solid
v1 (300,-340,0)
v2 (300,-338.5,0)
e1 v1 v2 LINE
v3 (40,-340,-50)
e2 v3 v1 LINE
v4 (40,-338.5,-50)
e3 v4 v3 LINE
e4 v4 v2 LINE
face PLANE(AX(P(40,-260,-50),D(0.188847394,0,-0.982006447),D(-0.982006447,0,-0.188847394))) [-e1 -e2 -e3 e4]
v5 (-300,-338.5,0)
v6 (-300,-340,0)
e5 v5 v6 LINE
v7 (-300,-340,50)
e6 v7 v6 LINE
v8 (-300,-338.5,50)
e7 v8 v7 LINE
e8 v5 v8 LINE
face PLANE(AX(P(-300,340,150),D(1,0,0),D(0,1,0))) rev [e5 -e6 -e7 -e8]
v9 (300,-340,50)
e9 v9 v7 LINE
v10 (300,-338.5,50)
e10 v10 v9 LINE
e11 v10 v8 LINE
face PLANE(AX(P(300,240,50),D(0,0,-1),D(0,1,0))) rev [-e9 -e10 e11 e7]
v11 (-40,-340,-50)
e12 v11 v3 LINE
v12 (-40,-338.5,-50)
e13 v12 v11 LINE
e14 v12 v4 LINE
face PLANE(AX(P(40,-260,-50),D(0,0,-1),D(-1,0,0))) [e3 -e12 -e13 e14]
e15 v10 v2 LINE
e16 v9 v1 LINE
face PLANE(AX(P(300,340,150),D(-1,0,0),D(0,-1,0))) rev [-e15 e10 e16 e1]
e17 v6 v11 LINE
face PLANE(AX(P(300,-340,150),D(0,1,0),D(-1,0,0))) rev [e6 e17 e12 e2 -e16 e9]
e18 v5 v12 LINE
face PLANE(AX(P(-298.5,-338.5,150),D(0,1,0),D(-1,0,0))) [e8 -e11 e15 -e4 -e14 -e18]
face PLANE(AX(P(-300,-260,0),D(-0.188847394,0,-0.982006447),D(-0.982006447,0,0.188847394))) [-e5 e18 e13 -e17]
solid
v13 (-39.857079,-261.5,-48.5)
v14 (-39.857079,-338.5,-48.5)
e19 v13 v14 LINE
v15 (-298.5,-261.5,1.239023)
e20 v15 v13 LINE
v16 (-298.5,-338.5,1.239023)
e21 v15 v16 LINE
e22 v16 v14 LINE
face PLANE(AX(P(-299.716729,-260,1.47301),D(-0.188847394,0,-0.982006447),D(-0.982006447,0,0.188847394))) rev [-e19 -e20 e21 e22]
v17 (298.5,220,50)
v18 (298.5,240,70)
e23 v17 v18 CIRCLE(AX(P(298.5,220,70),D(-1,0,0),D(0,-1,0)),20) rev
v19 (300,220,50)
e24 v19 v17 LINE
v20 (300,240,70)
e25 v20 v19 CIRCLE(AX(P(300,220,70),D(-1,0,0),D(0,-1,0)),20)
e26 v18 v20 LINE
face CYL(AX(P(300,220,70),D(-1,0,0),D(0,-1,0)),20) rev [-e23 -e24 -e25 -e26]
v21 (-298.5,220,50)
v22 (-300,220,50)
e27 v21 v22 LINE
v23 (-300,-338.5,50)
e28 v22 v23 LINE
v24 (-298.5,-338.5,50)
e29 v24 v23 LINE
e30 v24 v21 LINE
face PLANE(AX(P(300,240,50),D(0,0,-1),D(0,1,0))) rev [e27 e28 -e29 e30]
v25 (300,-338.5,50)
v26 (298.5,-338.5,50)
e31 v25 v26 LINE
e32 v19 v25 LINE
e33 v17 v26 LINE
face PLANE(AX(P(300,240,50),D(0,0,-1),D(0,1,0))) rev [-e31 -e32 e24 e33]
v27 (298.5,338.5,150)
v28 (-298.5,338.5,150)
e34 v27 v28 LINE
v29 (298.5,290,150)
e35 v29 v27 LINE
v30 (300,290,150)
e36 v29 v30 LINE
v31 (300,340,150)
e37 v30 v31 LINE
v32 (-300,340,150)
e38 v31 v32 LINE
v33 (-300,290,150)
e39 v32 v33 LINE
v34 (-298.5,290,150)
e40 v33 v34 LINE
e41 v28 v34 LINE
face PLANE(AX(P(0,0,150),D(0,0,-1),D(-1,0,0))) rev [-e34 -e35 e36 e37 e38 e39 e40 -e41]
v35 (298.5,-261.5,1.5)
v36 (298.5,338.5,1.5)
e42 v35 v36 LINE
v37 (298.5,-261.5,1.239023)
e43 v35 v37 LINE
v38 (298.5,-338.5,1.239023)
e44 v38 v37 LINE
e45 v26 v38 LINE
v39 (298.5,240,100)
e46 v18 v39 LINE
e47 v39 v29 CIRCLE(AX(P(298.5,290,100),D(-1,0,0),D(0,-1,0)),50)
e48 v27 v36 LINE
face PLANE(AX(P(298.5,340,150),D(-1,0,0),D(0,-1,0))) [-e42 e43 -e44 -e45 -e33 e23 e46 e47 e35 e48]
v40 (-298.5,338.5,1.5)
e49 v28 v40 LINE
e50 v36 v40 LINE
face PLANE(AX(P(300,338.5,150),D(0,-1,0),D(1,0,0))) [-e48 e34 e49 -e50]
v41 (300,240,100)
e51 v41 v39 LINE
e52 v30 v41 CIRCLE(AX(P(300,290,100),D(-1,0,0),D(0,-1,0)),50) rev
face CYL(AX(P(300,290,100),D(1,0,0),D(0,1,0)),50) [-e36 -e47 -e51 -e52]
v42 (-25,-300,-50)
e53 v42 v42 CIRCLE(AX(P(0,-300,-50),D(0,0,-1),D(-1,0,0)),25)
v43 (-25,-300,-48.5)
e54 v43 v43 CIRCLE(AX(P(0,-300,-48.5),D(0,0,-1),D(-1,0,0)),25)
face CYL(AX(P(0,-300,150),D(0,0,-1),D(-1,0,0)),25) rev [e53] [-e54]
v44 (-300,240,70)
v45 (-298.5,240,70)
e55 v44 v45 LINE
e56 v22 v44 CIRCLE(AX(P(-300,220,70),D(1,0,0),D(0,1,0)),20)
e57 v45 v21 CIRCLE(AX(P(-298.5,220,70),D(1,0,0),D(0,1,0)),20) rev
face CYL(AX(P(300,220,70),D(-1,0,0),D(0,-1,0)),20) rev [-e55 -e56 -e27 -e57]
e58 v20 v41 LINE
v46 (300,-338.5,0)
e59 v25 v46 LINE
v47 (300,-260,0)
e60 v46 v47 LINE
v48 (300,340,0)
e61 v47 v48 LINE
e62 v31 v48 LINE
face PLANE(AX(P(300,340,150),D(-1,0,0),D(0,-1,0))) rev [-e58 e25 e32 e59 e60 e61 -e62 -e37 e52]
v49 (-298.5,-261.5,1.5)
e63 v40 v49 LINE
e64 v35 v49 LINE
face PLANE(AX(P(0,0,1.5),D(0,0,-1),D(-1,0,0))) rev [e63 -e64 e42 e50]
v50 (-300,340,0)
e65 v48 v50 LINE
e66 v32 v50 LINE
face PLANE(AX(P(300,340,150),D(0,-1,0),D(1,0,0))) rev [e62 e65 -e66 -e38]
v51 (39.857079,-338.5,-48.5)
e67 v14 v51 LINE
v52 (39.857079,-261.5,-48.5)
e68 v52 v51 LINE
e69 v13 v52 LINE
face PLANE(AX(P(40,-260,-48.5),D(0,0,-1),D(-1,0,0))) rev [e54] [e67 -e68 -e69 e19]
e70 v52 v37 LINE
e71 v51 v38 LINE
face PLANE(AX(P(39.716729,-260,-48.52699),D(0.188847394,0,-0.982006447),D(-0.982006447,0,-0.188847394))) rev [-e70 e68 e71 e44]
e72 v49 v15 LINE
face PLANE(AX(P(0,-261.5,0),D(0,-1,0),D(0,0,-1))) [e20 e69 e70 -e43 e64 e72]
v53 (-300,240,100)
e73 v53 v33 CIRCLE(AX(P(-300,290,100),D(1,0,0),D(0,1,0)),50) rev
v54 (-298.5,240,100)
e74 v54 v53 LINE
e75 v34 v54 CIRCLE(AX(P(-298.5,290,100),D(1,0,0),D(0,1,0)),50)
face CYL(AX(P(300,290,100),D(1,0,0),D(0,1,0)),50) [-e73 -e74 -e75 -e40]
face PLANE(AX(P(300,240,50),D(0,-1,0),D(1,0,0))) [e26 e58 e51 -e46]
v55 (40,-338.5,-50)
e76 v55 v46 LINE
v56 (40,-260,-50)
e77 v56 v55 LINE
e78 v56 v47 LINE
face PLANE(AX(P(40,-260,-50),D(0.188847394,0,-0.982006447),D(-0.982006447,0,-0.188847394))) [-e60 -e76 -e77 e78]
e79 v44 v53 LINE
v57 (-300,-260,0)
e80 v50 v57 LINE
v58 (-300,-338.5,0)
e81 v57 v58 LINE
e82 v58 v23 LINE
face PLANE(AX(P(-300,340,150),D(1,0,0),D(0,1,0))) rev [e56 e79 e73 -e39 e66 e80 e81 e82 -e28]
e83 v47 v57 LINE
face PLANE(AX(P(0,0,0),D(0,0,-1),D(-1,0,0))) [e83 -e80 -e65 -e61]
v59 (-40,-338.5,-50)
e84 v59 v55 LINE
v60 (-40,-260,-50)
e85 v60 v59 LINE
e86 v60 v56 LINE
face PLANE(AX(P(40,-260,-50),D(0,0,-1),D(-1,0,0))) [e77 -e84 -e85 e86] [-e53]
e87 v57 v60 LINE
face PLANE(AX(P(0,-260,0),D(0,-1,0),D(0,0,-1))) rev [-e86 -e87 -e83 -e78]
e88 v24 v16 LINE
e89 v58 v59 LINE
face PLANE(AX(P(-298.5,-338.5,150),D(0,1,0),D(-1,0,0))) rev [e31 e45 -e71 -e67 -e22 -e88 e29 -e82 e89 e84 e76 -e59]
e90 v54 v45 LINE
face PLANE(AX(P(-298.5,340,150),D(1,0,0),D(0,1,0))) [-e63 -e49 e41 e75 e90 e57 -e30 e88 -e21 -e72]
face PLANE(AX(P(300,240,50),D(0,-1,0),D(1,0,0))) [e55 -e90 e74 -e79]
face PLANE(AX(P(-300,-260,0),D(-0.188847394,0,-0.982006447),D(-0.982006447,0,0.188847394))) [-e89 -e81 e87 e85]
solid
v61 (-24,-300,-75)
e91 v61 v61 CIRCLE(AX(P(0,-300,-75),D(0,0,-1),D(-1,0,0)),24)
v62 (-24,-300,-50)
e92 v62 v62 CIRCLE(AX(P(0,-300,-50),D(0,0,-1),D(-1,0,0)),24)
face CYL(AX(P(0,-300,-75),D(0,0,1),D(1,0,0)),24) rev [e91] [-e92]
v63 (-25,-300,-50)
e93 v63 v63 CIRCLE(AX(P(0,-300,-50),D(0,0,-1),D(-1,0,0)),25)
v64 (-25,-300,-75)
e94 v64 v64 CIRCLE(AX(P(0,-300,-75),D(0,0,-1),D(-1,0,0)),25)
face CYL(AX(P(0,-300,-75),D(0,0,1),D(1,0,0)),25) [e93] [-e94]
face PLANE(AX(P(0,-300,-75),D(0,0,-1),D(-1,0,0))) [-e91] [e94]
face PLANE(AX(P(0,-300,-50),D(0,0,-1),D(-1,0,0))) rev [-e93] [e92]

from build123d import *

# Parameters (mm, degrees)
SKETCH_6_W                 = 600
SKETCH_6_H                 = 680
EXTRUDE_2_DEPTH            = 150
EXTRUDE_4_DEPTH            = 80
SHELL_START                = -338.5
SHELL_2_OUTLINE_W          = 597
SHELL_2_OUTLINE_H          = 148.5
SHELL_2_DEPTH              = 677
SHELL_2_2_DEPTH            = 77
SKETCH_13_R                = 25
CUT_EXTRUDE_1_DEPTH        = 496.580467735
SPLIT_START                = -340
SPLIT_BODIES_5_DEPTH       = 1.5
SPLIT_BODIES_5_2_OUTLINE_W = 602
SPLIT_BODIES_5_2_OUTLINE_H = 203
SPLIT_BODIES_5_2_DEPTH     = 1.5
SKETCH_15_W                = 200.791070075
SKETCH_15_H                = 666.3886285
CUT_EXTRUDE_2_DEPTH        = 706.761999544
FILLET_1_R                 = 20
FILLET_2_R                 = 50
SKETCH_16_R                = 25
SKETCH_16_R_2              = 24
EXTRUDE_5_DEPTH            = 25


# Read off the part's stored shape, not the designer's step: 抽壳2, 分割5
with BuildPart() as part:
    # 草图6 → 凸台-拉伸2 (new body)
    with BuildSketch(Plane.XY):
        Rectangle(SKETCH_6_W, SKETCH_6_H)
    extrude(amount=EXTRUDE_2_DEPTH)

    # 草图8 → 凸台-拉伸4 (add)
    with BuildSketch(Plane.XZ.offset(340)):
        Polygon((-300, 0), (-40, -50), (40, -50), (300, 0), align=None)
    extrude(amount=-EXTRUDE_4_DEPTH)

    # 抽壳2 outline → 抽壳2 (cut)
    with BuildSketch(Plane(origin=(0, 0, 0), x_dir=(1, 0, 0), z_dir=(0, 1, 0)).offset(SHELL_START)):
        with Locations((0, -75.75)):
            Rectangle(SHELL_2_OUTLINE_W, SHELL_2_OUTLINE_H)
    extrude(amount=SHELL_2_DEPTH, mode=Mode.SUBTRACT)

    # Shell 2 2 outline → Shell 2 2 (cut)
    with BuildSketch(Plane(origin=(0, 0, 0), x_dir=(1, 0, 0), z_dir=(0, 1, 0)).offset(SHELL_START)):
        Polygon((-298.5, -1.5), (298.5, -1.5), (298.5, -1.239023342), (39.857078623, 48.5), (-39.857078623, 48.5), (-298.5, -1.239023342), align=None)
    extrude(amount=SHELL_2_2_DEPTH, mode=Mode.SUBTRACT)

    # 草图13 → 切除-拉伸1 (cut, through all)
    with BuildSketch(Plane(origin=(0, 0, -50), x_dir=(-1, 0, 0), z_dir=(0, 0, -1))):
        with Locations((0, -300)):
            Circle(SKETCH_13_R)
    extrude(amount=-CUT_EXTRUDE_1_DEPTH, mode=Mode.SUBTRACT)

    # Split Bodies 5 2 outline → Split Bodies 5 2 (cut)
    with BuildSketch(Plane(origin=(0, 0, 0), x_dir=(1, 0, 0), z_dir=(0, 1, 0)).offset(SPLIT_START)):
        with Locations((0, -49.5)):
            Rectangle(SPLIT_BODIES_5_2_OUTLINE_W, SPLIT_BODIES_5_2_OUTLINE_H)
    extrude(amount=SPLIT_BODIES_5_2_DEPTH, mode=Mode.SUBTRACT)


with BuildPart() as body_2:
    # Split Bodies 5 outline → Split Bodies 5 (new body)
    with BuildSketch(Plane(origin=(0, 0, 0), x_dir=(1, 0, 0), z_dir=(0, 1, 0)).offset(SPLIT_START)):
        Polygon((-300, -150), (300, -150), (300, 0), (40, 50), (-40, 50), (-300, 0), align=None)
    extrude(amount=SPLIT_BODIES_5_DEPTH)


with BuildPart() as cut_extrude_2_tool:
    # 草图15 → 切除-拉伸2 (new, through all)
    with BuildSketch(Plane.ZY.offset(300)):
        with Locations((150.395535037, -93.19431425)):
            Rectangle(SKETCH_15_W, SKETCH_15_H)
    extrude(amount=-CUT_EXTRUDE_2_DEPTH)


with BuildPart() as part_1:
    add(part.part)

    # 切除-拉伸2: cut by cut_extrude_2_tool
    add(cut_extrude_2_tool.part, mode=Mode.SUBTRACT)

    # 圆角1
    fillet_1_edges = [part_1.edges().sort_by_distance(p)[0] for p in [
        (-299.25, 240, 50),
        (299.25, 240, 50),
    ]]
    fillet(fillet_1_edges, radius=FILLET_1_R)

    # 圆角2
    fillet_2_edges = [part_1.edges().sort_by_distance(p)[0] for p in [
        (-299.25, 240, 150),
        (299.25, 240, 150),
    ]]
    fillet(fillet_2_edges, radius=FILLET_2_R)


with BuildPart() as body_2_1:
    add(body_2.part)

    # 切除-拉伸2: cut by cut_extrude_2_tool
    add(cut_extrude_2_tool.part, mode=Mode.SUBTRACT)


with BuildPart() as body_3:
    # 草图16 → 凸台-拉伸5 (new body)
    with BuildSketch(Plane(origin=(0, 0, -50), x_dir=(-1, 0, 0), z_dir=(0, 0, -1))):
        with Locations((0, -300)):
            Circle(SKETCH_16_R)
        with Locations((0, -300)):
            Circle(SKETCH_16_R_2, mode=Mode.SUBTRACT)
    extrude(amount=EXTRUDE_5_DEPTH)


solid = Compound([part_1.part, body_2_1.part, body_3.part])
